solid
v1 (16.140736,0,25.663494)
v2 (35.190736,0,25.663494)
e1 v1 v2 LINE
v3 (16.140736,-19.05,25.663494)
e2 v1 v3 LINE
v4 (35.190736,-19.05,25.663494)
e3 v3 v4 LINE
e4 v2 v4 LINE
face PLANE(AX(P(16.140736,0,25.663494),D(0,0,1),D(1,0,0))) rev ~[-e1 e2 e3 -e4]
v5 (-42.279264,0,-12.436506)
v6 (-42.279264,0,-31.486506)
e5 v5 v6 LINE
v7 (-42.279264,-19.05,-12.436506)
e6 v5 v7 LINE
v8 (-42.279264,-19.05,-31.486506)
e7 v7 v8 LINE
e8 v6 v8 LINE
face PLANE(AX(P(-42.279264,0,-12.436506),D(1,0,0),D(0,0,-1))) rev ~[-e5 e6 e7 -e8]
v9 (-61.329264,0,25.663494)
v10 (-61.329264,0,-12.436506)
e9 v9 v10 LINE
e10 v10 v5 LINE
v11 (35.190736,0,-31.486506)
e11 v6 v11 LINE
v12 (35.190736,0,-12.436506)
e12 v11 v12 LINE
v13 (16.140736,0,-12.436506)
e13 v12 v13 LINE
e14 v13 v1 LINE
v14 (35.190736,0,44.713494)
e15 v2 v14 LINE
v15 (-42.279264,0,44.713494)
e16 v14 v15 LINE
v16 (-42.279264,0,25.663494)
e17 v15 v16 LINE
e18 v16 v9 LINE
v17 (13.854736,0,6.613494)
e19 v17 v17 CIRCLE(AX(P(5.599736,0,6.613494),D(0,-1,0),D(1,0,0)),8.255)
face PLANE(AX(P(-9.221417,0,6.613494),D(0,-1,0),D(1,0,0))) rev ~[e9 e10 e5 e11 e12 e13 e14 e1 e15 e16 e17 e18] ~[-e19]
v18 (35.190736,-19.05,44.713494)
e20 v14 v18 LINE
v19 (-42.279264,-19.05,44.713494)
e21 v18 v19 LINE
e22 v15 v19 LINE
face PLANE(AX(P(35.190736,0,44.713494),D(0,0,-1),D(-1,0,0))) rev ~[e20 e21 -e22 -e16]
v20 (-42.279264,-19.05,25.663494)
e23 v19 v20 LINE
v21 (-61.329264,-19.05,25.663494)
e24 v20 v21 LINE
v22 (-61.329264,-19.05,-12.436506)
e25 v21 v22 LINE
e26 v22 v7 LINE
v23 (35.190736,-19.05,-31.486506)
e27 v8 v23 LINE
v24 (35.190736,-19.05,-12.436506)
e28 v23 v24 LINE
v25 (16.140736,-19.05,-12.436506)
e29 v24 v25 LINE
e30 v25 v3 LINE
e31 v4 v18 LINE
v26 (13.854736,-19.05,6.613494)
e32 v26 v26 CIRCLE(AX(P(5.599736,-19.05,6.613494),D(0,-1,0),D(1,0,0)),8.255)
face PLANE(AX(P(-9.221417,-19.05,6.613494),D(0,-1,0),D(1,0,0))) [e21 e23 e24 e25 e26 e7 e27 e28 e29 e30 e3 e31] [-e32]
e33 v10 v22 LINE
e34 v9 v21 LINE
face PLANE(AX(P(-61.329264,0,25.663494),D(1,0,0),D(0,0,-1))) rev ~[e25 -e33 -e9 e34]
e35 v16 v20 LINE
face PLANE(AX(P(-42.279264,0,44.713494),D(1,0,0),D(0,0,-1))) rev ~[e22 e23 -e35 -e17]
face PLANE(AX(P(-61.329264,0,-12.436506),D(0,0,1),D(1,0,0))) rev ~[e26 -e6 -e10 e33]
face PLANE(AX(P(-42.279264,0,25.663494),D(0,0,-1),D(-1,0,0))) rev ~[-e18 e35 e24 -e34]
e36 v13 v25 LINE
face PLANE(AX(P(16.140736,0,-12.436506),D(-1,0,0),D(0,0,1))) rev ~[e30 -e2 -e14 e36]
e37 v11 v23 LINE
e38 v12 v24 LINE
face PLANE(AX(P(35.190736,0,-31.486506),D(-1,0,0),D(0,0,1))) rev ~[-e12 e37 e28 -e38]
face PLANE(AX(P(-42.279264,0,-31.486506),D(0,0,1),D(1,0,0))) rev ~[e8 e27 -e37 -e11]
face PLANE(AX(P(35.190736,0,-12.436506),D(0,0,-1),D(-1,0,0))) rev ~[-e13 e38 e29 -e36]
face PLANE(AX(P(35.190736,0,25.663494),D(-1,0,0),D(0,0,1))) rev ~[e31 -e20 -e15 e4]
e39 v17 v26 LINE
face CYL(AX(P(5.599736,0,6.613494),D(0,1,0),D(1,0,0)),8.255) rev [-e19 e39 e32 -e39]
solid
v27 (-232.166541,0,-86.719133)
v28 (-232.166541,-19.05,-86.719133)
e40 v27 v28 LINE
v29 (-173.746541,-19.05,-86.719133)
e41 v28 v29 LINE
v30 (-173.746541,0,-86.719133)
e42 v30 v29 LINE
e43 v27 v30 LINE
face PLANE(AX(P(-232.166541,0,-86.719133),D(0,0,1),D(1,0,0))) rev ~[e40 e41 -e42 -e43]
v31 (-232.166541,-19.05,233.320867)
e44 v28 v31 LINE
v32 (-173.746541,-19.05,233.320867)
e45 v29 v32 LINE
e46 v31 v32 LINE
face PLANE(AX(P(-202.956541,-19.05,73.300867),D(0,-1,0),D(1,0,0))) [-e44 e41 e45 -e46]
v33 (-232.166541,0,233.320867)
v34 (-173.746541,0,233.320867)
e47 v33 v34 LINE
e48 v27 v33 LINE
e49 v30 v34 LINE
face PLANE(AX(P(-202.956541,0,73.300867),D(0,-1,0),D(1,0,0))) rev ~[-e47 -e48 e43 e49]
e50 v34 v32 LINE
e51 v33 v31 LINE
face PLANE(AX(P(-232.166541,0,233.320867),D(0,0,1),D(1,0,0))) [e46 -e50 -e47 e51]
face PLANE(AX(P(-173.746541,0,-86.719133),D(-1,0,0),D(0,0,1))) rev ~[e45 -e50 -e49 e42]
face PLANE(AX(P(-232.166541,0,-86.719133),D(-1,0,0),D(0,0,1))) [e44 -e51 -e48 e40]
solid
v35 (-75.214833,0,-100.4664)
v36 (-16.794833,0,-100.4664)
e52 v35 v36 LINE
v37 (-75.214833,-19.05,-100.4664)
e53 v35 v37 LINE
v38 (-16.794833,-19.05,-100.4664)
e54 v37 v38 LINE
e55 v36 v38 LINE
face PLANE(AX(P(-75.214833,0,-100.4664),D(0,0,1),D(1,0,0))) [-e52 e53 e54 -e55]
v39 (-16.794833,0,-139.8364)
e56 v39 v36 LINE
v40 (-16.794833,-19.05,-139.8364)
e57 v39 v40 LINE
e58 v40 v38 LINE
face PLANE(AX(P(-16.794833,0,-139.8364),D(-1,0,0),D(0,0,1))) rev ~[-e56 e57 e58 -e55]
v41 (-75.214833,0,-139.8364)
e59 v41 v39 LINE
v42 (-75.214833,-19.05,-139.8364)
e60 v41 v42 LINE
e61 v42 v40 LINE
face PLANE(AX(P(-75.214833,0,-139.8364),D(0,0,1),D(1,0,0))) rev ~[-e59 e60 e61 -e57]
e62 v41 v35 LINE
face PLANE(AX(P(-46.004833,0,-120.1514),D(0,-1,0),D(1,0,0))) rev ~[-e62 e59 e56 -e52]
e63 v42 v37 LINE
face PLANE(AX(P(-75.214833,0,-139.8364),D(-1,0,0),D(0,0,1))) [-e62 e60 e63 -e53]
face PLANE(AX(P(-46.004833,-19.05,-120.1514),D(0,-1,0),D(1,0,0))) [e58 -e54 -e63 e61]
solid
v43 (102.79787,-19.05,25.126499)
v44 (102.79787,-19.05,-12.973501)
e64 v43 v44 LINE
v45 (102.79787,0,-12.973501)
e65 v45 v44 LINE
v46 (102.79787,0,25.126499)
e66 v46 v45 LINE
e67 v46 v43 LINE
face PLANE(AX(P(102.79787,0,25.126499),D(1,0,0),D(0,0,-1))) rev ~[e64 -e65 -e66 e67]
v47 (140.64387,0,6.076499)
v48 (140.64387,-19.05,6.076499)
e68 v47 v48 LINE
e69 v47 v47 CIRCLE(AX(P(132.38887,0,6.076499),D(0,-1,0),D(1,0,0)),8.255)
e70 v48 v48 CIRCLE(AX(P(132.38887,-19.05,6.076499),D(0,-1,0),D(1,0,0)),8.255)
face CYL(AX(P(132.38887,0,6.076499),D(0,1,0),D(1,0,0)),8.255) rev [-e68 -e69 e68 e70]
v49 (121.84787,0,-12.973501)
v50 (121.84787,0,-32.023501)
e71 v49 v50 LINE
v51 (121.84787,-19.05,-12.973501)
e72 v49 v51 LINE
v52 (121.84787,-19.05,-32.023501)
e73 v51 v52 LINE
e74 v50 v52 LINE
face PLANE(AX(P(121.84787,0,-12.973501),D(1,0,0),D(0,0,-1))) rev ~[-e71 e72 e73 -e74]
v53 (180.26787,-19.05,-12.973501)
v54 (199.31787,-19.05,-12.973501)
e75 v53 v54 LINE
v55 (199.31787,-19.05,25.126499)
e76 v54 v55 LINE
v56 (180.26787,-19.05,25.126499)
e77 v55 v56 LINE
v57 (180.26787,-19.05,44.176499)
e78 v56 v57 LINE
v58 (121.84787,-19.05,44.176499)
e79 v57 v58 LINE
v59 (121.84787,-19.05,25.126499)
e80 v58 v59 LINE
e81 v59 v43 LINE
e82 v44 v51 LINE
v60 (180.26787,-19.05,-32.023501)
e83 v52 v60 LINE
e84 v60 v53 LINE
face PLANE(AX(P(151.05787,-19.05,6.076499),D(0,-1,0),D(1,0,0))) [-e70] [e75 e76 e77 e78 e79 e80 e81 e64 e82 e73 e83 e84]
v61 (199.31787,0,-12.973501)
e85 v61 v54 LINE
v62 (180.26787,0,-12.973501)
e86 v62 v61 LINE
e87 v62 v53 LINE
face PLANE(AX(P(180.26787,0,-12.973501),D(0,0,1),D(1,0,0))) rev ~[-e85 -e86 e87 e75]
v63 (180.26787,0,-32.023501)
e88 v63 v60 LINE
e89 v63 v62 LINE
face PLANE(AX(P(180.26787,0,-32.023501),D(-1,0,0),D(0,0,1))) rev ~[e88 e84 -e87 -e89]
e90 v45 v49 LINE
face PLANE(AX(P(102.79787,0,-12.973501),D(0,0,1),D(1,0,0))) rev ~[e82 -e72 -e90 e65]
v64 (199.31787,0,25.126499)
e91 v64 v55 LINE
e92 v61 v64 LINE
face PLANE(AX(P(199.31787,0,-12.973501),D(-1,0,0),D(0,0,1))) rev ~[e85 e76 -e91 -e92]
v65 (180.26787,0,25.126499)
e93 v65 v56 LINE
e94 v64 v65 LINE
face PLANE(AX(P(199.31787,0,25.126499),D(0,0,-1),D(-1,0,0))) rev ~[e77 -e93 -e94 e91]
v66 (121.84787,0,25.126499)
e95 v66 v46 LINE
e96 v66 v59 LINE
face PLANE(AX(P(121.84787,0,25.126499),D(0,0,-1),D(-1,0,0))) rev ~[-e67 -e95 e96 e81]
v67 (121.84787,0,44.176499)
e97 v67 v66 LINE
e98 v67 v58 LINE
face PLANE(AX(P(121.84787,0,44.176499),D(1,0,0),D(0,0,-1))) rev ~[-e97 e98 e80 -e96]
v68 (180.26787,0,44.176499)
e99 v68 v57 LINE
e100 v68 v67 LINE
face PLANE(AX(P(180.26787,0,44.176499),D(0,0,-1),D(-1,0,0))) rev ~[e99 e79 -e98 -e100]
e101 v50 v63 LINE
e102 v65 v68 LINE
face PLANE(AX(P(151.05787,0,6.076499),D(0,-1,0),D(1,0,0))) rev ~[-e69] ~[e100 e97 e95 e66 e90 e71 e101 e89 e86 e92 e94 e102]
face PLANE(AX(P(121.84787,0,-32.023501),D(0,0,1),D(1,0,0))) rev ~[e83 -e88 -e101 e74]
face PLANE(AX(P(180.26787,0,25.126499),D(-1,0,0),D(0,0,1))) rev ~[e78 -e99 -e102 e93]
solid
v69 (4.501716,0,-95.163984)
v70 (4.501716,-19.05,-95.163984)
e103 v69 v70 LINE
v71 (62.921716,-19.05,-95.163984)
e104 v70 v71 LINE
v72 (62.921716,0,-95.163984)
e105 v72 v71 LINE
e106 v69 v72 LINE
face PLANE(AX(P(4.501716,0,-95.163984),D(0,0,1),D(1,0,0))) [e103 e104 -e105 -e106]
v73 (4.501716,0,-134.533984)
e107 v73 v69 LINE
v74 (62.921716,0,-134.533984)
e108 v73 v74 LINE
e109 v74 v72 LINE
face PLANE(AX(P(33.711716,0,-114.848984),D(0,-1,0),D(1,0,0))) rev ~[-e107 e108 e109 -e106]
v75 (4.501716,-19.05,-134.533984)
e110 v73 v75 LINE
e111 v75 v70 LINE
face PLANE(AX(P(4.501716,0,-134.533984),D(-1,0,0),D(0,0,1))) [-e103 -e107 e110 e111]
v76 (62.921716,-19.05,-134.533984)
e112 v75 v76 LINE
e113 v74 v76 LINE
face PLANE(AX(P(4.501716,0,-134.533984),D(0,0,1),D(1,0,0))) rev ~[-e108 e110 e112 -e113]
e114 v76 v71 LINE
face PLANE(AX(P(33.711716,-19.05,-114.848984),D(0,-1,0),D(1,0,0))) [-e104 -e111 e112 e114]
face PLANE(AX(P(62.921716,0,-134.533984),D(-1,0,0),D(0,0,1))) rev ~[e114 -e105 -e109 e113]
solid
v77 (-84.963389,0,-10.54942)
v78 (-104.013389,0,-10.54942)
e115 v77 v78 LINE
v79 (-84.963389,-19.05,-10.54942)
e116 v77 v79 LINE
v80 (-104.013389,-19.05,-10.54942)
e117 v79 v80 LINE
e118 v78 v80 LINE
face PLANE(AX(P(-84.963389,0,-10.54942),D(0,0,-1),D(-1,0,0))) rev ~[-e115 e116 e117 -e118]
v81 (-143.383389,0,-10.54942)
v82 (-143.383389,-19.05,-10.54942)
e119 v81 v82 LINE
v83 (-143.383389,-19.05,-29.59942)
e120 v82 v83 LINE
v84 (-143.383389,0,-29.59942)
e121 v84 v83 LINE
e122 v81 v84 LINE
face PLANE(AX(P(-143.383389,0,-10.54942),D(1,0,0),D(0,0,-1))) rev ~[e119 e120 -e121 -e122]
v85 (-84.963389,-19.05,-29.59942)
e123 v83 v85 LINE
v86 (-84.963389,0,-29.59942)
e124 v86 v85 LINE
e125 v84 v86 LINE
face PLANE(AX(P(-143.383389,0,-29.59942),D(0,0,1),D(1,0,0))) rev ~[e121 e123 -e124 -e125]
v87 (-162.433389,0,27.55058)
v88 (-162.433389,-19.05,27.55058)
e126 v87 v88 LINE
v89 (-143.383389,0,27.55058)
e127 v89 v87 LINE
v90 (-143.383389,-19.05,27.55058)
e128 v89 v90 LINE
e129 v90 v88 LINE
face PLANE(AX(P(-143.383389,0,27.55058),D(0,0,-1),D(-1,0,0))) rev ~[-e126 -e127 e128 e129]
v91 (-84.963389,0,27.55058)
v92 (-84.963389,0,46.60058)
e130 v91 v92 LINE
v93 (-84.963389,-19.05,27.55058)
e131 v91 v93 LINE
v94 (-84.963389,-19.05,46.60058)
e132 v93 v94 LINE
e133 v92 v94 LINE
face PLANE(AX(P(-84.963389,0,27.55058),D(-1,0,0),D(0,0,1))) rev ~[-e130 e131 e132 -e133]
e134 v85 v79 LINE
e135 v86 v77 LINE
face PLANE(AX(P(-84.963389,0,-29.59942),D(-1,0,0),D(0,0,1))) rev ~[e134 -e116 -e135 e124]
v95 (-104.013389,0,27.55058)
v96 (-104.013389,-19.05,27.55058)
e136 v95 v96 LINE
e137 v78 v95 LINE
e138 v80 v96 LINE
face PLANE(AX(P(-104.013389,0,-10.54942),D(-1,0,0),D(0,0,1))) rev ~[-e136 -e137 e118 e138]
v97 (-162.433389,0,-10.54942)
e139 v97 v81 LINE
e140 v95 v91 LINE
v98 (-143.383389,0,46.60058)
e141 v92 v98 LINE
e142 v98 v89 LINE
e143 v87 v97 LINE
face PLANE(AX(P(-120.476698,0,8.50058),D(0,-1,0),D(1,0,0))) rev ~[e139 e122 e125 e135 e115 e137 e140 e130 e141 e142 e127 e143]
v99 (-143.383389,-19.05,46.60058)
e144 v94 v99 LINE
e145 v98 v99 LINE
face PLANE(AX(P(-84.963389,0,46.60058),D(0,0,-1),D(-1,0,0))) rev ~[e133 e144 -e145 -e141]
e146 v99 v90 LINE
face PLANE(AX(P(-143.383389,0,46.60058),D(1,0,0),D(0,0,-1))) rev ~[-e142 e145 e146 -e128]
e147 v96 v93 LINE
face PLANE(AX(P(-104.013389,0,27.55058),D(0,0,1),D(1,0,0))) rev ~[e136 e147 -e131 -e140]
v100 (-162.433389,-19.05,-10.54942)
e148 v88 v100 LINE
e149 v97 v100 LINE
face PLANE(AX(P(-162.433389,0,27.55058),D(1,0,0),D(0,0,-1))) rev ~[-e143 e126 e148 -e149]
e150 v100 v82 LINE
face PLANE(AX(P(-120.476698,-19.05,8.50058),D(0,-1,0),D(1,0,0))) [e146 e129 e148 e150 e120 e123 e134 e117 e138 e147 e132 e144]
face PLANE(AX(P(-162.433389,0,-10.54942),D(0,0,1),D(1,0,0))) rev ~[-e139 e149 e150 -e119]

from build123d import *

# Parameters (mm, degrees)
F1_DEPTH = 19.05
F0_R     = 8.255
F0_W     = 58.42
F0_H     = 39.37
F0_H_2   = 320.04
F2_DEPTH = 19.05


# Not quite as in the source:
# - a feature names something its author has since deleted; it is built from what else it names


with BuildPart() as f1:
    # F0 (on Front) → F1 (new body)
    with BuildSketch(Plane.XZ):
        Polygon((-84.963388741, 46.6005802155), (-143.383388741, 46.6005802155), (-143.383388741, 27.5505802155), (-162.433388741, 27.5505802155), (-162.433388741, -10.5494197845), (-143.383388741, -10.5494197845), (-143.383388741, -29.5994197845), (-84.963388741, -29.5994197845), (-84.963388741, -10.5494197845), (-104.013388741, -10.5494197845), (-104.013388741, 27.5505802155), (-84.963388741, 27.5505802155), align=None)
    extrude(amount=F1_DEPTH)


with BuildPart() as f1b:
    # F0 (on Front) → F1, piece 2 (new body)
    with BuildSketch(Plane.XZ):
        Polygon((35.1907358062, 44.7134936616), (-42.2792641938, 44.7134936616), (-42.2792641938, 25.6634936616), (-61.3292641938, 25.6634936616), (-61.3292641938, -12.4365063384), (-42.2792641938, -12.4365063384), (-42.2792641938, -31.4865063384), (35.1907358062, -31.4865063384), (35.1907358062, -12.4365063384), (16.1407358062, -12.4365063384), (16.1407358062, 25.6634936616), (35.1907358062, 25.6634936616), align=None)
        with Locations((5.5997358062, 6.6134936616)):
            Circle(F0_R, mode=Mode.SUBTRACT)
    extrude(amount=F1_DEPTH)


with BuildPart() as f1c:
    # F0 (on Front) → F1, piece 3 (new body)
    with BuildSketch(Plane.XZ):
        Polygon((180.2678704262, 44.1764993489), (121.8478704262, 44.1764993489), (121.8478704262, 25.1264993489), (102.7978704262, 25.1264993489), (102.7978704262, -12.9735006511), (121.8478704262, -12.9735006511), (121.8478704262, -32.0235006511), (180.2678704262, -32.0235006511), (180.2678704262, -12.9735006511), (199.3178704262, -12.9735006511), (199.3178704262, 25.1264993489), (180.2678704262, 25.1264993489), align=None)
        with Locations((132.3888704262, 6.0764993489)):
            Circle(F0_R, mode=Mode.SUBTRACT)
    extrude(amount=F1_DEPTH)


with BuildPart() as f1d:
    # F0 (on Front) → F1, piece 4 (new body)
    with BuildSketch(Plane.XZ):
        with Locations((-46.0048330212, -120.1514003849)):
            Rectangle(F0_W, F0_H)
    extrude(amount=F1_DEPTH)


with BuildPart() as f1e:
    # F0 (on Front) → F1, piece 5 (new body)
    with BuildSketch(Plane.XZ):
        with Locations((33.7117160036, -114.8489843512)):
            Rectangle(F0_W, F0_H)
    extrude(amount=F1_DEPTH)


with BuildPart() as f2:
    # F0 (on Front) → F2 (new body)
    with BuildSketch(Plane.XZ):
        with Locations((-202.9565411425, 73.3008670402)):
            Rectangle(F0_W, F0_H_2)
    extrude(amount=F2_DEPTH)


solid = Compound([f1.part, f1b.part, f1c.part, f1d.part, f1e.part, f2.part])
